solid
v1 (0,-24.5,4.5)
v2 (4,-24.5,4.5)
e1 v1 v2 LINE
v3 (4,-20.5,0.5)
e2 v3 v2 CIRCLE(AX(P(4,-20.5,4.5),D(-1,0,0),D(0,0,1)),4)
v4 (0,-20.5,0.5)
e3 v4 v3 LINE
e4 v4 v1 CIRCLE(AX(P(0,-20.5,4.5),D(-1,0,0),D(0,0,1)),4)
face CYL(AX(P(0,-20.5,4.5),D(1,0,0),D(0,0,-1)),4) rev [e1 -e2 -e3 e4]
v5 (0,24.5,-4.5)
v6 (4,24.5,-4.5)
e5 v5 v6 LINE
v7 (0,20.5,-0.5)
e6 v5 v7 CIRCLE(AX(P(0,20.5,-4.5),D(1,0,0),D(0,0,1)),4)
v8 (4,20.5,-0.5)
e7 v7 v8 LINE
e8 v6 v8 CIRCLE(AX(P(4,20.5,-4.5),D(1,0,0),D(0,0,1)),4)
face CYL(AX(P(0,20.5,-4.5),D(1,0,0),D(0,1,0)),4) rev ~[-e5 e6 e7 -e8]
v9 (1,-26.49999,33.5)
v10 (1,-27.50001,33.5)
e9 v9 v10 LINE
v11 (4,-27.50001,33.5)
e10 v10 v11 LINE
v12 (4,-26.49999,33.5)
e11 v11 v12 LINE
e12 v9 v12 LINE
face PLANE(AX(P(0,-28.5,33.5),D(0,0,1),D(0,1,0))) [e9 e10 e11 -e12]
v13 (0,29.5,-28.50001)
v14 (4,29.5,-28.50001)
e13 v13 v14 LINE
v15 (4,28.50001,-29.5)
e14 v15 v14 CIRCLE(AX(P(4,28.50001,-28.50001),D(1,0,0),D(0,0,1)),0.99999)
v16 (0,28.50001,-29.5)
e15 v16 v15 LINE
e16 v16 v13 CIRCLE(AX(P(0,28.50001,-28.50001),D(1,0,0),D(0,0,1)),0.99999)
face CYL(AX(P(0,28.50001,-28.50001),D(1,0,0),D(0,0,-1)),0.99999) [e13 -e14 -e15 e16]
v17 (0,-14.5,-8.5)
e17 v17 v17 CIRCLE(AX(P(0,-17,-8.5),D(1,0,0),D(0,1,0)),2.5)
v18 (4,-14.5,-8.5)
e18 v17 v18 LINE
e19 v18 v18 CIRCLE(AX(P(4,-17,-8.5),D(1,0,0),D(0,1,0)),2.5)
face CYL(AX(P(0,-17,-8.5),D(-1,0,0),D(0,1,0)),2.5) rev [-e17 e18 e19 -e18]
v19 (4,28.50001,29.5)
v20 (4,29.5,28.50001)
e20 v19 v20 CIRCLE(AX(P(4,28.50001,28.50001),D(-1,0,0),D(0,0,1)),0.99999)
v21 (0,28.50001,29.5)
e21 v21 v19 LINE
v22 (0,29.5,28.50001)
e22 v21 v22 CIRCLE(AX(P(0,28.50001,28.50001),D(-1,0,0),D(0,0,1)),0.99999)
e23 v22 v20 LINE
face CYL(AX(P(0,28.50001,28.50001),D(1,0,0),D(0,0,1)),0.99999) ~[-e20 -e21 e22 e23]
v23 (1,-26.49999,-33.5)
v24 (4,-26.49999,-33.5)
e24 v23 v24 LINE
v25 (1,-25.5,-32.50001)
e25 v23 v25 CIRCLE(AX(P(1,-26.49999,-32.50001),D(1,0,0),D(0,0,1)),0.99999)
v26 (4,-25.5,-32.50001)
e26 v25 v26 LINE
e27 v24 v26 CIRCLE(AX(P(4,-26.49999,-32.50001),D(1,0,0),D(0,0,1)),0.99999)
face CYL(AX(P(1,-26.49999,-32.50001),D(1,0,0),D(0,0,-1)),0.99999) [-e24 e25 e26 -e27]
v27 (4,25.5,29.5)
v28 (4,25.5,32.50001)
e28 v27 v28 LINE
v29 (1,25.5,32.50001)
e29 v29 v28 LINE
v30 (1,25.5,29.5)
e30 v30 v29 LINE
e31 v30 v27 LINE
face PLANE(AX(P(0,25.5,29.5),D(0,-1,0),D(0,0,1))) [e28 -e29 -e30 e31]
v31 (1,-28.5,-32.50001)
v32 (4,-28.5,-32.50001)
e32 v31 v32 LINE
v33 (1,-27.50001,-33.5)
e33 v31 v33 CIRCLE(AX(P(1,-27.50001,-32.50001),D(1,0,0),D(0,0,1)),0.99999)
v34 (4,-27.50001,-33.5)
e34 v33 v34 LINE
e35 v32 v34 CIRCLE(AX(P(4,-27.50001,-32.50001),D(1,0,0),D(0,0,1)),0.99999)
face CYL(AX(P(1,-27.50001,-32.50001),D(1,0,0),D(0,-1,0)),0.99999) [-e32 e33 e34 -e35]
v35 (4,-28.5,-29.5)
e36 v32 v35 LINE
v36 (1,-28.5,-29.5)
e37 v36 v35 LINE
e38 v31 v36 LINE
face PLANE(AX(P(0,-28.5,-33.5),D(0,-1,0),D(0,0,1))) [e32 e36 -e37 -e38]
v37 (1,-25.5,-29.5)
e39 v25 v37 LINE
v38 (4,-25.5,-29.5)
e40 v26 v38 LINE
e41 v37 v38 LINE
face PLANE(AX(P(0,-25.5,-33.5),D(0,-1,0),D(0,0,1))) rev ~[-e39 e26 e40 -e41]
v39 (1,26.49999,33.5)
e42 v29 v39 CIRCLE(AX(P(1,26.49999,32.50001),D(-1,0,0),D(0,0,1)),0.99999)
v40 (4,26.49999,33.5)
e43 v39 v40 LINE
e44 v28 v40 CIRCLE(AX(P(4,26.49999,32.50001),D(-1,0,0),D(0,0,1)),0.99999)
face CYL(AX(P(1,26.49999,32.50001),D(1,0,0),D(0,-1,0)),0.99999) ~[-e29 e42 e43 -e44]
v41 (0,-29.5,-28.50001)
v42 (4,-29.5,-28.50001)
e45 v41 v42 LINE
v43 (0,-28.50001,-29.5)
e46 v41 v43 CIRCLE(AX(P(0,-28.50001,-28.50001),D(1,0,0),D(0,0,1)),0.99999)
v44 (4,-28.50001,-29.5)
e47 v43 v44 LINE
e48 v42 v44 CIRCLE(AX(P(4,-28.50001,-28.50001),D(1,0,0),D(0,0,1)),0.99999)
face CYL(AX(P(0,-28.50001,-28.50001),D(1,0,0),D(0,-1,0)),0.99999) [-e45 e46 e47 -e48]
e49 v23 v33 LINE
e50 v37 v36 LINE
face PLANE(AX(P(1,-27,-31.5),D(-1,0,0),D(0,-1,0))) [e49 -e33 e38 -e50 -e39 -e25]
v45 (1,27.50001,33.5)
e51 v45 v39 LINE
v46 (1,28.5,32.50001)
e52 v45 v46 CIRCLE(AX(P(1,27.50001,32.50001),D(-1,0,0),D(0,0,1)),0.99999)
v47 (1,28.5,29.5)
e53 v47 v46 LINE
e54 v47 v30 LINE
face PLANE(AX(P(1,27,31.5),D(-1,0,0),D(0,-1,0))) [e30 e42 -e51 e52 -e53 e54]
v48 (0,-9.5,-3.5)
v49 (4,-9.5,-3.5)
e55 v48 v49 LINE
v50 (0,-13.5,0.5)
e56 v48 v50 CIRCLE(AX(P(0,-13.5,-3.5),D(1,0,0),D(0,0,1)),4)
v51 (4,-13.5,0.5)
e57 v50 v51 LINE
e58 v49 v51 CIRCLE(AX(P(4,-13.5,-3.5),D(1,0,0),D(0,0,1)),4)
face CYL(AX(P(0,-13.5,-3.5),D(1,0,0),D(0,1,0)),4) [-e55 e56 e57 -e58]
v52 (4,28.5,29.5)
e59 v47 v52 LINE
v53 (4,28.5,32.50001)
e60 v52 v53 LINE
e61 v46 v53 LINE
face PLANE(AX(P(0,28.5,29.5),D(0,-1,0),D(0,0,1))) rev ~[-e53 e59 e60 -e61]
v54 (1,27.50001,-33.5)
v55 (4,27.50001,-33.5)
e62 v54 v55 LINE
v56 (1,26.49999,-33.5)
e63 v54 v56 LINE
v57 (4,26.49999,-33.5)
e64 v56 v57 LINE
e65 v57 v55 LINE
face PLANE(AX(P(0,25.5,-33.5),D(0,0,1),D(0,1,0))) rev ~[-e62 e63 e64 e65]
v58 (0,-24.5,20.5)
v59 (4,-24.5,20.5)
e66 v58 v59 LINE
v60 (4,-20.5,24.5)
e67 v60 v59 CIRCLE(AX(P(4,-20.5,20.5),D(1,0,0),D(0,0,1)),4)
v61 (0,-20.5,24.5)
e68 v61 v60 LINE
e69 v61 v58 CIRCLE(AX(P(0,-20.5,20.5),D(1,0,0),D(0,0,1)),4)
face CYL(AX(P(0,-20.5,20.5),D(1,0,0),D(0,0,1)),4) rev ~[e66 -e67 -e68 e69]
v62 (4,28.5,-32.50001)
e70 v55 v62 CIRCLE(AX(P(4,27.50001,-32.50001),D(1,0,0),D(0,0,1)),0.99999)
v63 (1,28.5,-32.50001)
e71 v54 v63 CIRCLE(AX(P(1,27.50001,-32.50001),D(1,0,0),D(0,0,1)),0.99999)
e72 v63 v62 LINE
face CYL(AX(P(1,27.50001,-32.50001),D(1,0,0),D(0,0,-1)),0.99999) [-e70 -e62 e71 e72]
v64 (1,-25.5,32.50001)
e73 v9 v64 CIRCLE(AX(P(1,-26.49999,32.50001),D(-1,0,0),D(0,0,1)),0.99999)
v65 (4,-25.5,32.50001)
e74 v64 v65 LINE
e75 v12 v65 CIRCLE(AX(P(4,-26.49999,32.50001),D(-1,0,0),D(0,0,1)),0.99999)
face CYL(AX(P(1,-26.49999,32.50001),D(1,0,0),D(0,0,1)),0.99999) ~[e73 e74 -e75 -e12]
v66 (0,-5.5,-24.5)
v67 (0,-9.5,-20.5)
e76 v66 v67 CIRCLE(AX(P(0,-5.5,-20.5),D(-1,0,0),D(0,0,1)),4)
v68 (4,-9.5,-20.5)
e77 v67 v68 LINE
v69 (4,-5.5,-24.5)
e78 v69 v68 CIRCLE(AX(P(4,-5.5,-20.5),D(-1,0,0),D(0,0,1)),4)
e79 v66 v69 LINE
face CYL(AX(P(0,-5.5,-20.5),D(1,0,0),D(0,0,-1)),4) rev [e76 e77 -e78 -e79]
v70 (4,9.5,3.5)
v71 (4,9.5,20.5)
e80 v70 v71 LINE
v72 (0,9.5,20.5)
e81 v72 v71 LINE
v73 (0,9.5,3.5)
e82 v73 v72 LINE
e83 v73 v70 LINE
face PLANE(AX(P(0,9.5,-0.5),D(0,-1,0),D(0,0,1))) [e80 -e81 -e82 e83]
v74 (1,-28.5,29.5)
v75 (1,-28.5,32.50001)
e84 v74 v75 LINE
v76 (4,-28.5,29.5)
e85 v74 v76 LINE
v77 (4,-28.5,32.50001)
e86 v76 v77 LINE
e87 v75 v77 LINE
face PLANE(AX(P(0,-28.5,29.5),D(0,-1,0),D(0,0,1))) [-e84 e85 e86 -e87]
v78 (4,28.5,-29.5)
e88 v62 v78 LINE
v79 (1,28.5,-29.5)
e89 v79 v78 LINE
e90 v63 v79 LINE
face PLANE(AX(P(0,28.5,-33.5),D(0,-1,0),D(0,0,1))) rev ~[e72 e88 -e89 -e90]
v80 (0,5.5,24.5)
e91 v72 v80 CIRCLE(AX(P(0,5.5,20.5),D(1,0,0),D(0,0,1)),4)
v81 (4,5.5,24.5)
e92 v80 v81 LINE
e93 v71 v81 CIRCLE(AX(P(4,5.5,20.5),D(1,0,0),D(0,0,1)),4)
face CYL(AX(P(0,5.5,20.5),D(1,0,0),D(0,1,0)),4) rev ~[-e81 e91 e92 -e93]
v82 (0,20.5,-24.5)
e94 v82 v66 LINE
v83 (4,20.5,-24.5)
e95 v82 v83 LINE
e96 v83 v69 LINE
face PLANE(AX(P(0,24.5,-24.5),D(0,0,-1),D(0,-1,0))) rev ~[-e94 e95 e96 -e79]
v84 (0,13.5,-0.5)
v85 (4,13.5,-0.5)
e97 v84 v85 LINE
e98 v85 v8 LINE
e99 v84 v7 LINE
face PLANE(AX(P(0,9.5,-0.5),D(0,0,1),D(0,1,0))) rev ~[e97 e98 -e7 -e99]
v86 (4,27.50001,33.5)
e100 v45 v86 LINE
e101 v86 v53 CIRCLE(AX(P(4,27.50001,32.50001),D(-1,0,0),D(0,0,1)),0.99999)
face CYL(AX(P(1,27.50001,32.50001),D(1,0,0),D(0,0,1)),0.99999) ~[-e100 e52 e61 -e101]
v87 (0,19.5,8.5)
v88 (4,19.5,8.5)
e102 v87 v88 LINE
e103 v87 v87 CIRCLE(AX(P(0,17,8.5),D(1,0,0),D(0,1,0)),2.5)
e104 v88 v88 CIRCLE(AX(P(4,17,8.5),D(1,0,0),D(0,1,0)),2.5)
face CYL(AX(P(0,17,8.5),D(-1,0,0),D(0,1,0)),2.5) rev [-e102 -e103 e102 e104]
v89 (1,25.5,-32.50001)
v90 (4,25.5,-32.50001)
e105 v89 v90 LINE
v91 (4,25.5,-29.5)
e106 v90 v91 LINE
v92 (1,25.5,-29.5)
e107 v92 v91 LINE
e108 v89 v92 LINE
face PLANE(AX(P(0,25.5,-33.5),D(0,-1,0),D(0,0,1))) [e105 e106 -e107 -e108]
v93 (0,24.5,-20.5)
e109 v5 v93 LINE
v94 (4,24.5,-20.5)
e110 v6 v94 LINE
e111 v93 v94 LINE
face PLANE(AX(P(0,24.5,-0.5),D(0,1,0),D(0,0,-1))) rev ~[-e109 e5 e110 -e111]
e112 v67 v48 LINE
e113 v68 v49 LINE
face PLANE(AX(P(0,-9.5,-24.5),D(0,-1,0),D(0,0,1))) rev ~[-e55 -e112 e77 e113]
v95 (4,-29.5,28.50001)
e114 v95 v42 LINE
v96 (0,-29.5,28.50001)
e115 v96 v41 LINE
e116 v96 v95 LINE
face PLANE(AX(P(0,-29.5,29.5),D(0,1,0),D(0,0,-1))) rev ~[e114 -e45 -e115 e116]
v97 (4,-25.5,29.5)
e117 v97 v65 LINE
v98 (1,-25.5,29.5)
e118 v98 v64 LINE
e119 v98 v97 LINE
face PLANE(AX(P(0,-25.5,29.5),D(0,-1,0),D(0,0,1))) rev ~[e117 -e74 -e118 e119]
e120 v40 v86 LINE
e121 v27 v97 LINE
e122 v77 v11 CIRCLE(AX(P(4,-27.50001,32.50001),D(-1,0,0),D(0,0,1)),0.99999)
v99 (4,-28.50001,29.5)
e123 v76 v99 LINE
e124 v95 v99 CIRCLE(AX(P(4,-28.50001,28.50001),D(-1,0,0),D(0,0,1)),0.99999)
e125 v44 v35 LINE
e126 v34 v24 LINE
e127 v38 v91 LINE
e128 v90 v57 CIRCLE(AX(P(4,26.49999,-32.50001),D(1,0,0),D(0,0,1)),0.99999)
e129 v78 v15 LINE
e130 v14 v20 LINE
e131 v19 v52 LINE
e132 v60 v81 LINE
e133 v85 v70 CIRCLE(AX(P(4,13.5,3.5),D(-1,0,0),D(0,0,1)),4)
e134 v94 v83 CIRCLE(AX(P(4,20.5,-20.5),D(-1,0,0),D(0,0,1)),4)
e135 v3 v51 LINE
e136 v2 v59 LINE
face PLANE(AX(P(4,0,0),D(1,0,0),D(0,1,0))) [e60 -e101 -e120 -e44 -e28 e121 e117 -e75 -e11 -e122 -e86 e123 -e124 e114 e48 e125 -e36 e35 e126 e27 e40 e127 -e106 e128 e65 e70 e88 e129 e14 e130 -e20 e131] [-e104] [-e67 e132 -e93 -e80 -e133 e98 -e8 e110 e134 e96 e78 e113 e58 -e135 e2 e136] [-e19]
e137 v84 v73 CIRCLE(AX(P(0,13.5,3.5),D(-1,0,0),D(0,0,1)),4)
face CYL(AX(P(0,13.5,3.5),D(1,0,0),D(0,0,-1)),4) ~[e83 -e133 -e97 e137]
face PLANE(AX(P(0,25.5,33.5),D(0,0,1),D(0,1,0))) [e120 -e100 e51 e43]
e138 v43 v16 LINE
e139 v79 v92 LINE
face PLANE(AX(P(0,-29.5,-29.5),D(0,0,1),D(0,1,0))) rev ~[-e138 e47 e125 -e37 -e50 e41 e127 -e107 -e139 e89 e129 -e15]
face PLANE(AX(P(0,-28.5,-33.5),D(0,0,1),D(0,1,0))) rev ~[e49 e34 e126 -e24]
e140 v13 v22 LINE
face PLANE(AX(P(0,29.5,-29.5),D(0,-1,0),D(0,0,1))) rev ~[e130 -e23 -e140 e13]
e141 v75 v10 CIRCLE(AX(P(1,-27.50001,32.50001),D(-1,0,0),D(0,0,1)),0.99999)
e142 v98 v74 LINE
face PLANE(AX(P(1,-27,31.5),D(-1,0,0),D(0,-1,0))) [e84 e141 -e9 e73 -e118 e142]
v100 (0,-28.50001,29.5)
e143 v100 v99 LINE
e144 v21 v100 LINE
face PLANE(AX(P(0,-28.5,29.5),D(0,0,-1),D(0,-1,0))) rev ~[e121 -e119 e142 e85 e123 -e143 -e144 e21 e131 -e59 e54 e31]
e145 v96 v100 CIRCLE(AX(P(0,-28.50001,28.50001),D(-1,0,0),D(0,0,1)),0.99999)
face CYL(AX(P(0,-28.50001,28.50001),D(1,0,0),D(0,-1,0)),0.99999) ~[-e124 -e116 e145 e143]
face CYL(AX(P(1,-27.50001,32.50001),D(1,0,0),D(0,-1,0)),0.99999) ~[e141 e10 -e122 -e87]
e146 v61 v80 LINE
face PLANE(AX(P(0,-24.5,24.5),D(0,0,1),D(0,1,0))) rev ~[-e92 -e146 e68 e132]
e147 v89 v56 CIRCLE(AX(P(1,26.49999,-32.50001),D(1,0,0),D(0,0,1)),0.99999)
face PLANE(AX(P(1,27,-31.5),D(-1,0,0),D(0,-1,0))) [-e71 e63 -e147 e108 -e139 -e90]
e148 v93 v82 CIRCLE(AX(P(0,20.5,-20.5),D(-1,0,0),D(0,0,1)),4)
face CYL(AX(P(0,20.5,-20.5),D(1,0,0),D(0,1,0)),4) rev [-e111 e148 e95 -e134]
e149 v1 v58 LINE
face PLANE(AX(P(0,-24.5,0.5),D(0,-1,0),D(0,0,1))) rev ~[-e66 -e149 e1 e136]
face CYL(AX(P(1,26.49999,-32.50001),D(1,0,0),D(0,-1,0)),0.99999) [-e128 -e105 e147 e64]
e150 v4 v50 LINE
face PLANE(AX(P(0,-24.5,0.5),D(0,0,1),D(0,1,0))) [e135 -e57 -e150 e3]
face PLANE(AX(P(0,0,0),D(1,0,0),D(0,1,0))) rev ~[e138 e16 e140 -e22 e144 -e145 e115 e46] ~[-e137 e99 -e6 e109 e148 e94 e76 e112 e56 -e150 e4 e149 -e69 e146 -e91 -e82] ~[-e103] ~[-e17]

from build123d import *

# Parameters (mm, degrees)
F0_W     = 3
F0_H     = 4
F0_W_2   = 15
F0_H_2   = 25
F0_R     = 2.5
F1_DEPTH = 4
F2_W     = 3
F2_H     = 4
F3_DEPTH = 1
F4_R     = 4
F5_R     = 0.99999


# Not quite as in the source:
# - a fillet or chamfer is up to 0.001 mm smaller than in the source, because OpenCascade refuses the exact size


with BuildPart() as f1:
    # F0 (on Right) → F1 (new body)
    with BuildSketch(Plane.YZ):
        Polygon((-28.5, 29.5), (-29.5, 29.5), (-29.5, -29.5), (-28.5, -29.5), (-25.5, -29.5), (25.5, -29.5), (28.5, -29.5), (29.5, -29.5), (29.5, 29.5), (28.5, 29.5), (25.5, 29.5), (-25.5, 29.5), align=None)
        Polygon((-24.5, 0.5), (-24.5, 24.5), (9.5, 24.5), (24.5, 24.5), (24.5, -0.5), (24.5, -24.5), (-9.5, -24.5), (-24.5, -24.5), align=None, mode=Mode.SUBTRACT)
        with Locations((-27, 31.5)):
            Rectangle(F0_W, F0_H)
        with Locations((27, 31.5)):
            Rectangle(F0_W, F0_H)
        with Locations((-27, -31.5)):
            Rectangle(F0_W, F0_H)
        with Locations((27, -31.5)):
            Rectangle(F0_W, F0_H)
        with Locations((-17, -12)):
            Rectangle(F0_W_2, F0_H_2)
        with Locations((-17, -8.5)):
            Circle(F0_R, mode=Mode.SUBTRACT)
        with Locations((17, 12)):
            Rectangle(F0_W_2, F0_H_2)
        with Locations((17, 8.5)):
            Circle(F0_R, mode=Mode.SUBTRACT)
    extrude(amount=F1_DEPTH)

    # F2 (on face) → F3 (cut)
    with BuildSketch(Plane(origin=(0, 0, 0), x_dir=(0, -1, 0), z_dir=(-1, 0, 0))):
        with Locations((-27, 31.5)):
            Rectangle(F2_W, F2_H)
        with Locations((27, 31.5)):
            Rectangle(F2_W, F2_H)
        with Locations((-27, -31.5)):
            Rectangle(F2_W, F2_H)
        with Locations((27, -31.5)):
            Rectangle(F2_W, F2_H)
    extrude(amount=-F3_DEPTH, mode=Mode.SUBTRACT)

    # F4
    f4_edges = [f1.edges().sort_by_distance(p)[0] for p in [
        (2, 9.5, -0.5),
        (2, 9.5, 24.5),
        (2, 24.5, -0.5),
        (2, -9.5, 0.5),
        (2, -24.5, 0.5),
        (2, -9.5, -24.5),
        (2, -24.5, 24.5),
        (2, 24.5, -24.5),
    ]]
    fillet(f4_edges, radius=F4_R)

    # F5 (radius 1 in the source; OpenCascade refuses exactly that, so slightly less here)
    f5_edges = [f1.edges().sort_by_distance(p)[0] for p in [
        (2.5, 28.5, 33.5),
        (2.5, 25.5, 33.5),
        (2.5, -25.5, 33.5),
        (2.5, -28.5, 33.5),
        (2, 29.5, 29.5),
        (2, -29.5, 29.5),
        (2, -29.5, -29.5),
        (2.5, -28.5, -33.5),
        (2.5, -25.5, -33.5),
        (2, 29.5, -29.5),
        (2.5, 28.5, -33.5),
        (2.5, 25.5, -33.5),
    ]]
    fillet(f5_edges, radius=F5_R)


solid = f1.part
